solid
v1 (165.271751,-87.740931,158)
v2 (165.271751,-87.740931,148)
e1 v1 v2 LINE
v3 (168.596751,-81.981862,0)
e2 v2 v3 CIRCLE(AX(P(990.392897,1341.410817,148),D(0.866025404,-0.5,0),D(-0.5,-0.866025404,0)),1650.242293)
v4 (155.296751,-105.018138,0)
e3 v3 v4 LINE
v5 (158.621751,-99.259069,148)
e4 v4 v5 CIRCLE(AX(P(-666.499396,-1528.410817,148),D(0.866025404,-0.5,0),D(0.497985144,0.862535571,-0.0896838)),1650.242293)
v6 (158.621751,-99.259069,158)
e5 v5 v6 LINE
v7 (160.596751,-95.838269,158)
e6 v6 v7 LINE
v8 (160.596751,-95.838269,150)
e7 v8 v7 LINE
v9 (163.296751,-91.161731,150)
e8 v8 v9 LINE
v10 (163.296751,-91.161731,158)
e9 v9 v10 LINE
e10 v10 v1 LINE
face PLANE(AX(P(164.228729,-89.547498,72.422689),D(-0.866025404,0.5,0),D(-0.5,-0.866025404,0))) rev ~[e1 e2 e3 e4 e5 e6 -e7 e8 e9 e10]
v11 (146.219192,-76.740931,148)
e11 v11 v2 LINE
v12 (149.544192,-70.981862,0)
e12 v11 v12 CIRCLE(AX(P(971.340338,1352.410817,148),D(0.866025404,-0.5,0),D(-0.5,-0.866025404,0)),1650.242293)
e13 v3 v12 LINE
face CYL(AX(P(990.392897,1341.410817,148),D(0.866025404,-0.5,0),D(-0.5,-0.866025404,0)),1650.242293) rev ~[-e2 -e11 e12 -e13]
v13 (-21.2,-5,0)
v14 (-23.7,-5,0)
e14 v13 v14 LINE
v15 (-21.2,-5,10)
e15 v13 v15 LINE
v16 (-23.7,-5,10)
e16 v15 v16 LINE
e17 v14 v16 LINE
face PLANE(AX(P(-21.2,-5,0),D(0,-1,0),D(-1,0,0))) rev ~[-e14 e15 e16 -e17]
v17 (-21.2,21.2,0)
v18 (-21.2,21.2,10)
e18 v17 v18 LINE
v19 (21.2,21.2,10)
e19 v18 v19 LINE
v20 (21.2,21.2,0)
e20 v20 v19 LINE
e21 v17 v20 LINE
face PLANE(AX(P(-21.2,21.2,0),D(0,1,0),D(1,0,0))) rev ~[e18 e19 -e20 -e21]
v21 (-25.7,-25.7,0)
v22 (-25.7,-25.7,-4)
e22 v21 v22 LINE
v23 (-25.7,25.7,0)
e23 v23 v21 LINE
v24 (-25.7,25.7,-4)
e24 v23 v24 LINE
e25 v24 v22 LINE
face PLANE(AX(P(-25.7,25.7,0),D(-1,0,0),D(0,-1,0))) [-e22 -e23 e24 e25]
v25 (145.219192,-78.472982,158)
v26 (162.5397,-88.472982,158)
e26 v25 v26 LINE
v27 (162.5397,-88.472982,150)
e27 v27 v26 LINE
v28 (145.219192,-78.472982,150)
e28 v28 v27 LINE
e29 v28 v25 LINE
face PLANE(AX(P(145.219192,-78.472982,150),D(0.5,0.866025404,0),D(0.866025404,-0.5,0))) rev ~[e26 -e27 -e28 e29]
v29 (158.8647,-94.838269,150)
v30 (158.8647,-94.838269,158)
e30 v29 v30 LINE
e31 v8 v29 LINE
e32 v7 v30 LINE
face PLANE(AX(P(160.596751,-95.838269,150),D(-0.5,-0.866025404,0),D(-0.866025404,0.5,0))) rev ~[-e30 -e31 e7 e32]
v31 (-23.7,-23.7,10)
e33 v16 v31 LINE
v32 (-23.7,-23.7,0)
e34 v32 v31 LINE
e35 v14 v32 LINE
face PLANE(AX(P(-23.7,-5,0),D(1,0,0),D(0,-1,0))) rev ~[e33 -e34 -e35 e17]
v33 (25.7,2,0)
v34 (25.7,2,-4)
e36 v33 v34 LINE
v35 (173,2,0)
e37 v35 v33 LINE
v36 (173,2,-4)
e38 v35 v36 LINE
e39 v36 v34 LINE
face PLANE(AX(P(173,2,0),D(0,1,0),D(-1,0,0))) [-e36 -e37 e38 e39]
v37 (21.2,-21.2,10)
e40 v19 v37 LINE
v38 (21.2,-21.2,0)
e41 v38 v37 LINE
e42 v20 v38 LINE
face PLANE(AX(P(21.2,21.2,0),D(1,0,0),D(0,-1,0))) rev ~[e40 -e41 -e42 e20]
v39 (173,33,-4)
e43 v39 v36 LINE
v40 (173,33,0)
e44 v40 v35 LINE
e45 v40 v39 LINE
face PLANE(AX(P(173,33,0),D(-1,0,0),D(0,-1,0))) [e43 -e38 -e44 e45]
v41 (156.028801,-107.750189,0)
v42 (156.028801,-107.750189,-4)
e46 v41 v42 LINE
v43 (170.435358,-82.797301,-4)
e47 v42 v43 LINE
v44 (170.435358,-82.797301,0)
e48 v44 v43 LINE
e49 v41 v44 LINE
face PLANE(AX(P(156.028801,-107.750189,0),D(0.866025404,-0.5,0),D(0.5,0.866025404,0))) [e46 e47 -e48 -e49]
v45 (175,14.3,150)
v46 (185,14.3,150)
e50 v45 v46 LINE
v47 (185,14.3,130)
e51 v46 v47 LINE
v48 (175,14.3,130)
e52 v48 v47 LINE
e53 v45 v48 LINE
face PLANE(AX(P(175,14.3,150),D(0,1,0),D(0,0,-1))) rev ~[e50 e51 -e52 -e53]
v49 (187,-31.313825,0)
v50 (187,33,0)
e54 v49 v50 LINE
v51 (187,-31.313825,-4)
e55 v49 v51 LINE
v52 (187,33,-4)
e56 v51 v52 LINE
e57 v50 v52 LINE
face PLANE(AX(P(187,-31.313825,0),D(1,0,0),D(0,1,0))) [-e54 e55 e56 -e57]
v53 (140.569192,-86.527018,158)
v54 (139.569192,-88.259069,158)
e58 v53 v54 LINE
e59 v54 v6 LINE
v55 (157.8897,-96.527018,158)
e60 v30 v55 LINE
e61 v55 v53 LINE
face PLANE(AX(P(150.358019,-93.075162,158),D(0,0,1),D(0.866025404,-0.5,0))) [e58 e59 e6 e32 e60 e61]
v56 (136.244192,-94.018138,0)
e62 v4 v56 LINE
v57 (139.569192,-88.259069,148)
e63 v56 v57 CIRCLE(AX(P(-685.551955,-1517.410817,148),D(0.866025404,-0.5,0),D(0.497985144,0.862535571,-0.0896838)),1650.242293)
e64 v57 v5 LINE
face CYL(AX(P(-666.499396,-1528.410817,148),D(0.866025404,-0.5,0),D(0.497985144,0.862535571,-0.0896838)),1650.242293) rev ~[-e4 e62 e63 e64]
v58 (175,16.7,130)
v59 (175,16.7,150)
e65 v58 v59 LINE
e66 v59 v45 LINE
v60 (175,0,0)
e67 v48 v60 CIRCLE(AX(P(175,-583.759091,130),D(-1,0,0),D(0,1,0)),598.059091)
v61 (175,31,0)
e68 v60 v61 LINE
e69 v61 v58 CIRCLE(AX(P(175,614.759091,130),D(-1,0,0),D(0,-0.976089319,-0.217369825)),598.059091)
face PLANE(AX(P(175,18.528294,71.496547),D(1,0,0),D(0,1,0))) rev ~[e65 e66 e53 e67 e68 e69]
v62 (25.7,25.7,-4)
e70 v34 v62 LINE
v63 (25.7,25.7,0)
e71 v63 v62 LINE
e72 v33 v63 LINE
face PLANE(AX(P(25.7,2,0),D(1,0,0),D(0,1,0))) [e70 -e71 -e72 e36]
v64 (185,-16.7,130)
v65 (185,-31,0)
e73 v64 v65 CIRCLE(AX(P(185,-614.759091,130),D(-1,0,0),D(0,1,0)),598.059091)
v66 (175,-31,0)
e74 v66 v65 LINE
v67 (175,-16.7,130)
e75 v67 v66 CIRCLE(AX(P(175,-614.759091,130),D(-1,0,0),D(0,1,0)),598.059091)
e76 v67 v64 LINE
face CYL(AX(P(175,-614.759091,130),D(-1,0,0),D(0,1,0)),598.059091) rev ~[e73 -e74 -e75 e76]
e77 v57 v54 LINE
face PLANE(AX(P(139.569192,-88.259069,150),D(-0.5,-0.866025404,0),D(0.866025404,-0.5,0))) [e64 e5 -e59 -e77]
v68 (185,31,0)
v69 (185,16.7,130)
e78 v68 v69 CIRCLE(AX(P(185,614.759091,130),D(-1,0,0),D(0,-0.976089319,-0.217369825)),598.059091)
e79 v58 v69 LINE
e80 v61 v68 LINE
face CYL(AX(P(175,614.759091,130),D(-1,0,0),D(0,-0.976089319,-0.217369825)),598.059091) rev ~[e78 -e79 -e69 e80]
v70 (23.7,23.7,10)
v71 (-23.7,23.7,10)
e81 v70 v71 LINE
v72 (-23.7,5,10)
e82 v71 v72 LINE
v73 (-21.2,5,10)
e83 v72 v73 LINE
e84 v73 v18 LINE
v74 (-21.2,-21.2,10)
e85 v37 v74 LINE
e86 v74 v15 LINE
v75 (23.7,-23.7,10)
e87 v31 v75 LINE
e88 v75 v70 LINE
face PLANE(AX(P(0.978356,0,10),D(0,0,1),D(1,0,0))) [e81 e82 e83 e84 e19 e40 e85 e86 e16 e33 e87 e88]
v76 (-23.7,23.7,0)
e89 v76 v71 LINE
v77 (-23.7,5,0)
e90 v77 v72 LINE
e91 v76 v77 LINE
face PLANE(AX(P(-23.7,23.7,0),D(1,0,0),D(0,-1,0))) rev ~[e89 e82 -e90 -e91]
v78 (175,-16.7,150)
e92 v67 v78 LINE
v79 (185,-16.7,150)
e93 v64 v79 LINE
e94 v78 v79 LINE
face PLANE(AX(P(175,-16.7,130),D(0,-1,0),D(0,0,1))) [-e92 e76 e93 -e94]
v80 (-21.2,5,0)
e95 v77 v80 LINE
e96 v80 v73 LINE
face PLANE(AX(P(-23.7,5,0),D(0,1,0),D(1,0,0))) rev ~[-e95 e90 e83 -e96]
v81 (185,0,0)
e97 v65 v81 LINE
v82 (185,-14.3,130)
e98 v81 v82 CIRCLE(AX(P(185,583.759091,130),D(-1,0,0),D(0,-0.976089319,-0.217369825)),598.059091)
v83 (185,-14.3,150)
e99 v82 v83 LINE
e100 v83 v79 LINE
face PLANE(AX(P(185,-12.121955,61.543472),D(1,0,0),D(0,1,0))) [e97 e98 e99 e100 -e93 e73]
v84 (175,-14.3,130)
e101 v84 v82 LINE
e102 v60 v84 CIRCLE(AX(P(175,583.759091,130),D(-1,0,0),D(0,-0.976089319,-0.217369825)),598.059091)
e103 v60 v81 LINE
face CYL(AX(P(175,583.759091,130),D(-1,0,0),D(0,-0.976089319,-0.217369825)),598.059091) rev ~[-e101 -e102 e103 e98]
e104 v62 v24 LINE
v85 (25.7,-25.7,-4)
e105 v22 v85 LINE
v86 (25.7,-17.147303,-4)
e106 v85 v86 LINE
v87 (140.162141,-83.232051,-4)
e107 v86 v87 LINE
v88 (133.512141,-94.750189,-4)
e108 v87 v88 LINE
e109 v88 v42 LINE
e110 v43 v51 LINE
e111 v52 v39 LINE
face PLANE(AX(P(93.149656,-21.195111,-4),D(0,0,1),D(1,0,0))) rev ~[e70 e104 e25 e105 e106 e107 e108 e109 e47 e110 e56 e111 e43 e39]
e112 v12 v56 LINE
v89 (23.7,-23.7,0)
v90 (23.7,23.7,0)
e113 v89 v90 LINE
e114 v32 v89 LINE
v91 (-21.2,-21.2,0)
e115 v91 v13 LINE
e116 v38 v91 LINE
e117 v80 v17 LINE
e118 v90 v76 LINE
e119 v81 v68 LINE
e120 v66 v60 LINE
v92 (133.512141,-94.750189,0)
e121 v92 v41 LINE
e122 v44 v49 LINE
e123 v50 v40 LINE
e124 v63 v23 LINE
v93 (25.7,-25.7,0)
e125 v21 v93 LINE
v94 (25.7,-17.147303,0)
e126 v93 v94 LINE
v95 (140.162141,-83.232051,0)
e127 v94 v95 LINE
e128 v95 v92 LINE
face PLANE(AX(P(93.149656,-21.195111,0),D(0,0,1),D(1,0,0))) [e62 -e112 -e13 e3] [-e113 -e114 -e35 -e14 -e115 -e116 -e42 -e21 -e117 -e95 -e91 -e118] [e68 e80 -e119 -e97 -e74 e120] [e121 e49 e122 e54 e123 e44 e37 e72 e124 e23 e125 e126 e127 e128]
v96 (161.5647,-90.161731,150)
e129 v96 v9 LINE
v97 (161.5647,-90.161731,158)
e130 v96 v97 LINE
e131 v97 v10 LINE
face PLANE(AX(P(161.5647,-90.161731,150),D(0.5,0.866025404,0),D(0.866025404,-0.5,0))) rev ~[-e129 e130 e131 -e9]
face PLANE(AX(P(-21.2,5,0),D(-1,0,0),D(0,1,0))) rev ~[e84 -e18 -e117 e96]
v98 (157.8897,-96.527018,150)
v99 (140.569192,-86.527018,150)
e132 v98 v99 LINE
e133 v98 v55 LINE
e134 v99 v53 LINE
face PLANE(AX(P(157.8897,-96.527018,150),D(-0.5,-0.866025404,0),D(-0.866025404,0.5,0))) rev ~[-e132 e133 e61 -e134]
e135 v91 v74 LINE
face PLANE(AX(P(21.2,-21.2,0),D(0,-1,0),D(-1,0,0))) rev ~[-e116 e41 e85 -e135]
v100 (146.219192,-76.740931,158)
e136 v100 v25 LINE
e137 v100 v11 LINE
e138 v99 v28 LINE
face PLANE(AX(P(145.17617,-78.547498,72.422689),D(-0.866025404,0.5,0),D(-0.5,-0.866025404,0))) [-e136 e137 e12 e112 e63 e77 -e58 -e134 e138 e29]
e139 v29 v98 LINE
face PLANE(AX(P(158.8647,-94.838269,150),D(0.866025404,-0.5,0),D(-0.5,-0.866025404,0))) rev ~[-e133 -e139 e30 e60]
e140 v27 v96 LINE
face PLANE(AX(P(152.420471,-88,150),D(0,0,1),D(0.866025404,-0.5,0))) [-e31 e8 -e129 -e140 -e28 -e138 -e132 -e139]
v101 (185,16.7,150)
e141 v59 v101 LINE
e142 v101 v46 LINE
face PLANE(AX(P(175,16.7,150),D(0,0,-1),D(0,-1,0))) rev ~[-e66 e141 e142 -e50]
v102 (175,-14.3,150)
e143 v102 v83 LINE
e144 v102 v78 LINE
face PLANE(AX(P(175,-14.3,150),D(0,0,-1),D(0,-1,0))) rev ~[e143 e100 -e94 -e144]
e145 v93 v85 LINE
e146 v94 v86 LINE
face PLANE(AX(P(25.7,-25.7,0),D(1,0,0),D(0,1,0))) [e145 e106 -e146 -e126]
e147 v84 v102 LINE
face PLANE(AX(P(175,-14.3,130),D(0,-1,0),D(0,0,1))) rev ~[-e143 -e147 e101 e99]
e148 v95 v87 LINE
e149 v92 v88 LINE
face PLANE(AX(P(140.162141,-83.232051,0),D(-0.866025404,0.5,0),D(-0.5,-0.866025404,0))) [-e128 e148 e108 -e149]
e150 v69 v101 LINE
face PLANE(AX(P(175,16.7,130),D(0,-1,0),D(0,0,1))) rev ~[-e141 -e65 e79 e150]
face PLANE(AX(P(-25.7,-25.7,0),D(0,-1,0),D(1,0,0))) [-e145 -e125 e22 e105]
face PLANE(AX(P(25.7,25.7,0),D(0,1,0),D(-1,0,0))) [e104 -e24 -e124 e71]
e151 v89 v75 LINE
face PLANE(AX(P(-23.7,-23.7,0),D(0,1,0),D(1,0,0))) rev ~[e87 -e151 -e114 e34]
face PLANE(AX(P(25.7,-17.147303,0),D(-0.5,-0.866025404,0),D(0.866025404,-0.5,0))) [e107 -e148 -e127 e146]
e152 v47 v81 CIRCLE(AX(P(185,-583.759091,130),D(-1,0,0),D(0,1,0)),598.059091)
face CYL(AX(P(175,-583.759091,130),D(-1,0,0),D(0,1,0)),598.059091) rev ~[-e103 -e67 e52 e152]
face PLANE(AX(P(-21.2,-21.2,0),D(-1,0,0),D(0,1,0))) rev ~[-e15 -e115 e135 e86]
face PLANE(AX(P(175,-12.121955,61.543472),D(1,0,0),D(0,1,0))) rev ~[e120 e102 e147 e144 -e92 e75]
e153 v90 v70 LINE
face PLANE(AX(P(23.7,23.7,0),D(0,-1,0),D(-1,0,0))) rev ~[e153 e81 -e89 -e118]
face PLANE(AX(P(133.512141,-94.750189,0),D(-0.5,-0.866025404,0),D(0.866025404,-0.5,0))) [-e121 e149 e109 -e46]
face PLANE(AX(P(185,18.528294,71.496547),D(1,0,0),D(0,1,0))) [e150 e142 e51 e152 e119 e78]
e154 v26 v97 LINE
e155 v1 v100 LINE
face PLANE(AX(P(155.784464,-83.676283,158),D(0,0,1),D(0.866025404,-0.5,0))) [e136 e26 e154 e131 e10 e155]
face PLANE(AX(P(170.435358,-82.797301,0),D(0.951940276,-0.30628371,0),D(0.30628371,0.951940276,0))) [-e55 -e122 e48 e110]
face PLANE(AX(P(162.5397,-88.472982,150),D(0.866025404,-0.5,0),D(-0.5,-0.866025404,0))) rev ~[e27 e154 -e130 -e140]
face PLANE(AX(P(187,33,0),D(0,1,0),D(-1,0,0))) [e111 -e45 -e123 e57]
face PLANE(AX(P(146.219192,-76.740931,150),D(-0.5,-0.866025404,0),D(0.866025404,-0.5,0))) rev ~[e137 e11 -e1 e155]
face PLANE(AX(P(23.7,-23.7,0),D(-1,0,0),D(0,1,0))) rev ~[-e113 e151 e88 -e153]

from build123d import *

# Parameters (mm, degrees)
F1_DEPTH  = 10
F5_DEPTH  = 10
F4_W      = 1.2
F4_H      = 20
F12_DEPTH = 8
F13_W     = 22
F13_H     = 13.3
F14_DEPTH = 2
F17_DEPTH = 22
F19_ANGLE = -30
F21_DEPTH = 4


# Not quite as in the source:
# - the program builds the solid bodies; features that only make, move or delete a surface that nothing else refers to are left out


with BuildPart() as f1:
    # F0 (on Top) → F1 (new body)
    with BuildSketch(Plane.XY):
        Polygon((-21.2, 21.2), (21.2, 21.2), (21.2, -21.2), (-21.2, -21.2), (-21.2, -5), (-23.7, -5), (-23.7, -23.7), (23.7, -23.7), (23.7, 23.7), (-23.7, 23.7), (-23.7, 5), (-21.2, 5), align=None)
    extrude(amount=F1_DEPTH)



with BuildPart() as f5:
    # F4 (on line) → F5 (new body)
    with BuildSketch(Plane.YZ.offset(175)):
        with BuildLine():
            Line((15.5, 130), (15.5, 0))
            Line((15.5, 0), (31, 0))
            ThreePointArc((31, 0), (20.2857494387, 64.6079324383), (16.7, 130))
            Line((16.7, 130), (16.7, 150))
            Line((16.7, 150), (15.5, 150))
            Line((15.5, 150), (15.5, 130))
        make_face()
        with BuildLine():
            ThreePointArc((14.3, 130), (10.7142505613, 64.6079324383), (0, 0))
            Line((0, 0), (15.5, 0))
            Line((15.5, 0), (15.5, 130))
            Line((15.5, 130), (15.5, 150))
            Line((15.5, 150), (14.3, 150))
            Line((14.3, 150), (14.3, 130))
        make_face()
    extrude(amount=F5_DEPTH)

    # F4 (on line) → F5, piece 2 (join)
    with BuildSketch(Plane.YZ.offset(175)):
        with BuildLine():
            Line((-15.5, 0), (0, 0))
            ThreePointArc((0, 0), (-10.7142505613, 64.6079324383), (-14.3, 130))
            Line((-14.3, 130), (-15.5, 130))
            Line((-15.5, 130), (-15.5, 0))
        make_face()
        with BuildLine():
            Line((-31, 0), (-15.5, 0))
            Line((-15.5, 0), (-15.5, 130))
            Line((-15.5, 130), (-16.7, 130))
            ThreePointArc((-16.7, 130), (-20.2857494387, 64.6079324383), (-31, 0))
        make_face()
        with Locations((-14.9, 140)):
            Rectangle(F4_W, F4_H)
        with Locations((-16.1, 140)):
            Rectangle(F4_W, F4_H)
    extrude(amount=F5_DEPTH)


with BuildPart() as f12:
    # F11 (on line) → F12 (new body)
    with BuildSketch(Plane.XY.offset(150)):
        Polygon((141.5544456623, -82.85), (161.5544456623, -82.85), (161.5544456623, -84.8), (163.5544456623, -84.8), (163.5544456623, -80.85), (141.5544456623, -80.85), align=None)
    extrude(amount=F12_DEPTH)



with BuildPart() as f12b:
    # F11 (on line) → F12, piece 2 (new body)
    with BuildSketch(Plane.XY.offset(150)):
        Polygon((161.5544456623, -92.15), (141.5544456623, -92.15), (141.5544456623, -94.15), (163.5544456623, -94.15), (163.5544456623, -90.2), (161.5544456623, -90.2), align=None)
    extrude(amount=F12_DEPTH)


with BuildPart() as f12_1:
    add(f12.part)

    add(f12b.part)  # F14 merges F12b
    # F13 (on line) → F14 (join)
    with BuildSketch(Plane.XY.offset(150)):
        with Locations((152.5544456623, -87.5)):
            Rectangle(F13_W, F13_H)
    extrude(amount=-F14_DEPTH)

    # F16 (on face) → F17 (join)
    with BuildSketch(Plane(origin=(163.5544456623, 0, 0), x_dir=(0, -1, 0), z_dir=(-1, 0, 0))):
        with BuildLine():
            Line((87.5, 0), (87.5, 148))
            Line((87.5, 148), (80.85, 148))
            ThreePointArc((80.85, 148), (79.1866617309, 73.9253374966), (74.2, 0))
            Line((74.2, 0), (87.5, 0))
        make_face()
        with BuildLine():
            Line((94.15, 148), (87.5, 148))
            Line((87.5, 148), (87.5, 0))
            Line((87.5, 0), (100.8, 0))
            ThreePointArc((100.8, 0), (95.8133382691, 73.9253374966), (94.15, 148))
        make_face()
    extrude(amount=F17_DEPTH)

    # F18: union 


with BuildPart() as f12_2:
    # F19: moved
    add(f12_1.part.rotate(Axis((151.5544456623, -87.5, 75), (0, 0, 1)), F19_ANGLE))


with BuildPart() as f1_1:
    add(f1.part)

    add(f5.part)  # F21 merges F5

    add(f12_2.part)  # F21 merges F12
    # F20 (on Top) → F21 (join)
    with BuildSketch(Plane.XY):
        Polygon((-25.7, 25.7), (-25.7, -25.7), (25.7, -25.7), (25.7, -17.1473029949), (140.1621408169, -83.2320508076), (133.5121408169, -94.7501886779), (156.0288013153, -107.7501886779), (170.4353579421, -82.7973006382), (187, -31.313824878), (187, 0), (187, 33), (173, 33), (173, 2), (25.7, 2), (25.7, 25.7), align=None)
        Polygon((23.7, 0), (175, 0), (175, 31), (185, 31), (185, 0), (185, -31), (168.5967505077, -81.9818621297), (155.2967505077, -105.0181378703), (136.2441916244, -94.0181378703), (142.8941916244, -82.5), (23.7, -13.6832013798), (23.7, -23.7), (-23.7, -23.7), (-23.7, 23.7), (23.7, 23.7), align=None, mode=Mode.SUBTRACT)
        Polygon((175, 31), (175, 0), (23.7, 0), (23.7, 23.7), (-23.7, 23.7), (-23.7, -23.7), (23.7, -23.7), (23.7, -13.6832013798), (142.8941916244, -82.5), (136.2441916244, -94.0181378703), (155.2967505077, -105.0181378703), (168.5967505077, -81.9818621297), (185, -31), (185, 0), (185, 31), align=None)
    extrude(amount=-F21_DEPTH)


solid = f1_1.part
